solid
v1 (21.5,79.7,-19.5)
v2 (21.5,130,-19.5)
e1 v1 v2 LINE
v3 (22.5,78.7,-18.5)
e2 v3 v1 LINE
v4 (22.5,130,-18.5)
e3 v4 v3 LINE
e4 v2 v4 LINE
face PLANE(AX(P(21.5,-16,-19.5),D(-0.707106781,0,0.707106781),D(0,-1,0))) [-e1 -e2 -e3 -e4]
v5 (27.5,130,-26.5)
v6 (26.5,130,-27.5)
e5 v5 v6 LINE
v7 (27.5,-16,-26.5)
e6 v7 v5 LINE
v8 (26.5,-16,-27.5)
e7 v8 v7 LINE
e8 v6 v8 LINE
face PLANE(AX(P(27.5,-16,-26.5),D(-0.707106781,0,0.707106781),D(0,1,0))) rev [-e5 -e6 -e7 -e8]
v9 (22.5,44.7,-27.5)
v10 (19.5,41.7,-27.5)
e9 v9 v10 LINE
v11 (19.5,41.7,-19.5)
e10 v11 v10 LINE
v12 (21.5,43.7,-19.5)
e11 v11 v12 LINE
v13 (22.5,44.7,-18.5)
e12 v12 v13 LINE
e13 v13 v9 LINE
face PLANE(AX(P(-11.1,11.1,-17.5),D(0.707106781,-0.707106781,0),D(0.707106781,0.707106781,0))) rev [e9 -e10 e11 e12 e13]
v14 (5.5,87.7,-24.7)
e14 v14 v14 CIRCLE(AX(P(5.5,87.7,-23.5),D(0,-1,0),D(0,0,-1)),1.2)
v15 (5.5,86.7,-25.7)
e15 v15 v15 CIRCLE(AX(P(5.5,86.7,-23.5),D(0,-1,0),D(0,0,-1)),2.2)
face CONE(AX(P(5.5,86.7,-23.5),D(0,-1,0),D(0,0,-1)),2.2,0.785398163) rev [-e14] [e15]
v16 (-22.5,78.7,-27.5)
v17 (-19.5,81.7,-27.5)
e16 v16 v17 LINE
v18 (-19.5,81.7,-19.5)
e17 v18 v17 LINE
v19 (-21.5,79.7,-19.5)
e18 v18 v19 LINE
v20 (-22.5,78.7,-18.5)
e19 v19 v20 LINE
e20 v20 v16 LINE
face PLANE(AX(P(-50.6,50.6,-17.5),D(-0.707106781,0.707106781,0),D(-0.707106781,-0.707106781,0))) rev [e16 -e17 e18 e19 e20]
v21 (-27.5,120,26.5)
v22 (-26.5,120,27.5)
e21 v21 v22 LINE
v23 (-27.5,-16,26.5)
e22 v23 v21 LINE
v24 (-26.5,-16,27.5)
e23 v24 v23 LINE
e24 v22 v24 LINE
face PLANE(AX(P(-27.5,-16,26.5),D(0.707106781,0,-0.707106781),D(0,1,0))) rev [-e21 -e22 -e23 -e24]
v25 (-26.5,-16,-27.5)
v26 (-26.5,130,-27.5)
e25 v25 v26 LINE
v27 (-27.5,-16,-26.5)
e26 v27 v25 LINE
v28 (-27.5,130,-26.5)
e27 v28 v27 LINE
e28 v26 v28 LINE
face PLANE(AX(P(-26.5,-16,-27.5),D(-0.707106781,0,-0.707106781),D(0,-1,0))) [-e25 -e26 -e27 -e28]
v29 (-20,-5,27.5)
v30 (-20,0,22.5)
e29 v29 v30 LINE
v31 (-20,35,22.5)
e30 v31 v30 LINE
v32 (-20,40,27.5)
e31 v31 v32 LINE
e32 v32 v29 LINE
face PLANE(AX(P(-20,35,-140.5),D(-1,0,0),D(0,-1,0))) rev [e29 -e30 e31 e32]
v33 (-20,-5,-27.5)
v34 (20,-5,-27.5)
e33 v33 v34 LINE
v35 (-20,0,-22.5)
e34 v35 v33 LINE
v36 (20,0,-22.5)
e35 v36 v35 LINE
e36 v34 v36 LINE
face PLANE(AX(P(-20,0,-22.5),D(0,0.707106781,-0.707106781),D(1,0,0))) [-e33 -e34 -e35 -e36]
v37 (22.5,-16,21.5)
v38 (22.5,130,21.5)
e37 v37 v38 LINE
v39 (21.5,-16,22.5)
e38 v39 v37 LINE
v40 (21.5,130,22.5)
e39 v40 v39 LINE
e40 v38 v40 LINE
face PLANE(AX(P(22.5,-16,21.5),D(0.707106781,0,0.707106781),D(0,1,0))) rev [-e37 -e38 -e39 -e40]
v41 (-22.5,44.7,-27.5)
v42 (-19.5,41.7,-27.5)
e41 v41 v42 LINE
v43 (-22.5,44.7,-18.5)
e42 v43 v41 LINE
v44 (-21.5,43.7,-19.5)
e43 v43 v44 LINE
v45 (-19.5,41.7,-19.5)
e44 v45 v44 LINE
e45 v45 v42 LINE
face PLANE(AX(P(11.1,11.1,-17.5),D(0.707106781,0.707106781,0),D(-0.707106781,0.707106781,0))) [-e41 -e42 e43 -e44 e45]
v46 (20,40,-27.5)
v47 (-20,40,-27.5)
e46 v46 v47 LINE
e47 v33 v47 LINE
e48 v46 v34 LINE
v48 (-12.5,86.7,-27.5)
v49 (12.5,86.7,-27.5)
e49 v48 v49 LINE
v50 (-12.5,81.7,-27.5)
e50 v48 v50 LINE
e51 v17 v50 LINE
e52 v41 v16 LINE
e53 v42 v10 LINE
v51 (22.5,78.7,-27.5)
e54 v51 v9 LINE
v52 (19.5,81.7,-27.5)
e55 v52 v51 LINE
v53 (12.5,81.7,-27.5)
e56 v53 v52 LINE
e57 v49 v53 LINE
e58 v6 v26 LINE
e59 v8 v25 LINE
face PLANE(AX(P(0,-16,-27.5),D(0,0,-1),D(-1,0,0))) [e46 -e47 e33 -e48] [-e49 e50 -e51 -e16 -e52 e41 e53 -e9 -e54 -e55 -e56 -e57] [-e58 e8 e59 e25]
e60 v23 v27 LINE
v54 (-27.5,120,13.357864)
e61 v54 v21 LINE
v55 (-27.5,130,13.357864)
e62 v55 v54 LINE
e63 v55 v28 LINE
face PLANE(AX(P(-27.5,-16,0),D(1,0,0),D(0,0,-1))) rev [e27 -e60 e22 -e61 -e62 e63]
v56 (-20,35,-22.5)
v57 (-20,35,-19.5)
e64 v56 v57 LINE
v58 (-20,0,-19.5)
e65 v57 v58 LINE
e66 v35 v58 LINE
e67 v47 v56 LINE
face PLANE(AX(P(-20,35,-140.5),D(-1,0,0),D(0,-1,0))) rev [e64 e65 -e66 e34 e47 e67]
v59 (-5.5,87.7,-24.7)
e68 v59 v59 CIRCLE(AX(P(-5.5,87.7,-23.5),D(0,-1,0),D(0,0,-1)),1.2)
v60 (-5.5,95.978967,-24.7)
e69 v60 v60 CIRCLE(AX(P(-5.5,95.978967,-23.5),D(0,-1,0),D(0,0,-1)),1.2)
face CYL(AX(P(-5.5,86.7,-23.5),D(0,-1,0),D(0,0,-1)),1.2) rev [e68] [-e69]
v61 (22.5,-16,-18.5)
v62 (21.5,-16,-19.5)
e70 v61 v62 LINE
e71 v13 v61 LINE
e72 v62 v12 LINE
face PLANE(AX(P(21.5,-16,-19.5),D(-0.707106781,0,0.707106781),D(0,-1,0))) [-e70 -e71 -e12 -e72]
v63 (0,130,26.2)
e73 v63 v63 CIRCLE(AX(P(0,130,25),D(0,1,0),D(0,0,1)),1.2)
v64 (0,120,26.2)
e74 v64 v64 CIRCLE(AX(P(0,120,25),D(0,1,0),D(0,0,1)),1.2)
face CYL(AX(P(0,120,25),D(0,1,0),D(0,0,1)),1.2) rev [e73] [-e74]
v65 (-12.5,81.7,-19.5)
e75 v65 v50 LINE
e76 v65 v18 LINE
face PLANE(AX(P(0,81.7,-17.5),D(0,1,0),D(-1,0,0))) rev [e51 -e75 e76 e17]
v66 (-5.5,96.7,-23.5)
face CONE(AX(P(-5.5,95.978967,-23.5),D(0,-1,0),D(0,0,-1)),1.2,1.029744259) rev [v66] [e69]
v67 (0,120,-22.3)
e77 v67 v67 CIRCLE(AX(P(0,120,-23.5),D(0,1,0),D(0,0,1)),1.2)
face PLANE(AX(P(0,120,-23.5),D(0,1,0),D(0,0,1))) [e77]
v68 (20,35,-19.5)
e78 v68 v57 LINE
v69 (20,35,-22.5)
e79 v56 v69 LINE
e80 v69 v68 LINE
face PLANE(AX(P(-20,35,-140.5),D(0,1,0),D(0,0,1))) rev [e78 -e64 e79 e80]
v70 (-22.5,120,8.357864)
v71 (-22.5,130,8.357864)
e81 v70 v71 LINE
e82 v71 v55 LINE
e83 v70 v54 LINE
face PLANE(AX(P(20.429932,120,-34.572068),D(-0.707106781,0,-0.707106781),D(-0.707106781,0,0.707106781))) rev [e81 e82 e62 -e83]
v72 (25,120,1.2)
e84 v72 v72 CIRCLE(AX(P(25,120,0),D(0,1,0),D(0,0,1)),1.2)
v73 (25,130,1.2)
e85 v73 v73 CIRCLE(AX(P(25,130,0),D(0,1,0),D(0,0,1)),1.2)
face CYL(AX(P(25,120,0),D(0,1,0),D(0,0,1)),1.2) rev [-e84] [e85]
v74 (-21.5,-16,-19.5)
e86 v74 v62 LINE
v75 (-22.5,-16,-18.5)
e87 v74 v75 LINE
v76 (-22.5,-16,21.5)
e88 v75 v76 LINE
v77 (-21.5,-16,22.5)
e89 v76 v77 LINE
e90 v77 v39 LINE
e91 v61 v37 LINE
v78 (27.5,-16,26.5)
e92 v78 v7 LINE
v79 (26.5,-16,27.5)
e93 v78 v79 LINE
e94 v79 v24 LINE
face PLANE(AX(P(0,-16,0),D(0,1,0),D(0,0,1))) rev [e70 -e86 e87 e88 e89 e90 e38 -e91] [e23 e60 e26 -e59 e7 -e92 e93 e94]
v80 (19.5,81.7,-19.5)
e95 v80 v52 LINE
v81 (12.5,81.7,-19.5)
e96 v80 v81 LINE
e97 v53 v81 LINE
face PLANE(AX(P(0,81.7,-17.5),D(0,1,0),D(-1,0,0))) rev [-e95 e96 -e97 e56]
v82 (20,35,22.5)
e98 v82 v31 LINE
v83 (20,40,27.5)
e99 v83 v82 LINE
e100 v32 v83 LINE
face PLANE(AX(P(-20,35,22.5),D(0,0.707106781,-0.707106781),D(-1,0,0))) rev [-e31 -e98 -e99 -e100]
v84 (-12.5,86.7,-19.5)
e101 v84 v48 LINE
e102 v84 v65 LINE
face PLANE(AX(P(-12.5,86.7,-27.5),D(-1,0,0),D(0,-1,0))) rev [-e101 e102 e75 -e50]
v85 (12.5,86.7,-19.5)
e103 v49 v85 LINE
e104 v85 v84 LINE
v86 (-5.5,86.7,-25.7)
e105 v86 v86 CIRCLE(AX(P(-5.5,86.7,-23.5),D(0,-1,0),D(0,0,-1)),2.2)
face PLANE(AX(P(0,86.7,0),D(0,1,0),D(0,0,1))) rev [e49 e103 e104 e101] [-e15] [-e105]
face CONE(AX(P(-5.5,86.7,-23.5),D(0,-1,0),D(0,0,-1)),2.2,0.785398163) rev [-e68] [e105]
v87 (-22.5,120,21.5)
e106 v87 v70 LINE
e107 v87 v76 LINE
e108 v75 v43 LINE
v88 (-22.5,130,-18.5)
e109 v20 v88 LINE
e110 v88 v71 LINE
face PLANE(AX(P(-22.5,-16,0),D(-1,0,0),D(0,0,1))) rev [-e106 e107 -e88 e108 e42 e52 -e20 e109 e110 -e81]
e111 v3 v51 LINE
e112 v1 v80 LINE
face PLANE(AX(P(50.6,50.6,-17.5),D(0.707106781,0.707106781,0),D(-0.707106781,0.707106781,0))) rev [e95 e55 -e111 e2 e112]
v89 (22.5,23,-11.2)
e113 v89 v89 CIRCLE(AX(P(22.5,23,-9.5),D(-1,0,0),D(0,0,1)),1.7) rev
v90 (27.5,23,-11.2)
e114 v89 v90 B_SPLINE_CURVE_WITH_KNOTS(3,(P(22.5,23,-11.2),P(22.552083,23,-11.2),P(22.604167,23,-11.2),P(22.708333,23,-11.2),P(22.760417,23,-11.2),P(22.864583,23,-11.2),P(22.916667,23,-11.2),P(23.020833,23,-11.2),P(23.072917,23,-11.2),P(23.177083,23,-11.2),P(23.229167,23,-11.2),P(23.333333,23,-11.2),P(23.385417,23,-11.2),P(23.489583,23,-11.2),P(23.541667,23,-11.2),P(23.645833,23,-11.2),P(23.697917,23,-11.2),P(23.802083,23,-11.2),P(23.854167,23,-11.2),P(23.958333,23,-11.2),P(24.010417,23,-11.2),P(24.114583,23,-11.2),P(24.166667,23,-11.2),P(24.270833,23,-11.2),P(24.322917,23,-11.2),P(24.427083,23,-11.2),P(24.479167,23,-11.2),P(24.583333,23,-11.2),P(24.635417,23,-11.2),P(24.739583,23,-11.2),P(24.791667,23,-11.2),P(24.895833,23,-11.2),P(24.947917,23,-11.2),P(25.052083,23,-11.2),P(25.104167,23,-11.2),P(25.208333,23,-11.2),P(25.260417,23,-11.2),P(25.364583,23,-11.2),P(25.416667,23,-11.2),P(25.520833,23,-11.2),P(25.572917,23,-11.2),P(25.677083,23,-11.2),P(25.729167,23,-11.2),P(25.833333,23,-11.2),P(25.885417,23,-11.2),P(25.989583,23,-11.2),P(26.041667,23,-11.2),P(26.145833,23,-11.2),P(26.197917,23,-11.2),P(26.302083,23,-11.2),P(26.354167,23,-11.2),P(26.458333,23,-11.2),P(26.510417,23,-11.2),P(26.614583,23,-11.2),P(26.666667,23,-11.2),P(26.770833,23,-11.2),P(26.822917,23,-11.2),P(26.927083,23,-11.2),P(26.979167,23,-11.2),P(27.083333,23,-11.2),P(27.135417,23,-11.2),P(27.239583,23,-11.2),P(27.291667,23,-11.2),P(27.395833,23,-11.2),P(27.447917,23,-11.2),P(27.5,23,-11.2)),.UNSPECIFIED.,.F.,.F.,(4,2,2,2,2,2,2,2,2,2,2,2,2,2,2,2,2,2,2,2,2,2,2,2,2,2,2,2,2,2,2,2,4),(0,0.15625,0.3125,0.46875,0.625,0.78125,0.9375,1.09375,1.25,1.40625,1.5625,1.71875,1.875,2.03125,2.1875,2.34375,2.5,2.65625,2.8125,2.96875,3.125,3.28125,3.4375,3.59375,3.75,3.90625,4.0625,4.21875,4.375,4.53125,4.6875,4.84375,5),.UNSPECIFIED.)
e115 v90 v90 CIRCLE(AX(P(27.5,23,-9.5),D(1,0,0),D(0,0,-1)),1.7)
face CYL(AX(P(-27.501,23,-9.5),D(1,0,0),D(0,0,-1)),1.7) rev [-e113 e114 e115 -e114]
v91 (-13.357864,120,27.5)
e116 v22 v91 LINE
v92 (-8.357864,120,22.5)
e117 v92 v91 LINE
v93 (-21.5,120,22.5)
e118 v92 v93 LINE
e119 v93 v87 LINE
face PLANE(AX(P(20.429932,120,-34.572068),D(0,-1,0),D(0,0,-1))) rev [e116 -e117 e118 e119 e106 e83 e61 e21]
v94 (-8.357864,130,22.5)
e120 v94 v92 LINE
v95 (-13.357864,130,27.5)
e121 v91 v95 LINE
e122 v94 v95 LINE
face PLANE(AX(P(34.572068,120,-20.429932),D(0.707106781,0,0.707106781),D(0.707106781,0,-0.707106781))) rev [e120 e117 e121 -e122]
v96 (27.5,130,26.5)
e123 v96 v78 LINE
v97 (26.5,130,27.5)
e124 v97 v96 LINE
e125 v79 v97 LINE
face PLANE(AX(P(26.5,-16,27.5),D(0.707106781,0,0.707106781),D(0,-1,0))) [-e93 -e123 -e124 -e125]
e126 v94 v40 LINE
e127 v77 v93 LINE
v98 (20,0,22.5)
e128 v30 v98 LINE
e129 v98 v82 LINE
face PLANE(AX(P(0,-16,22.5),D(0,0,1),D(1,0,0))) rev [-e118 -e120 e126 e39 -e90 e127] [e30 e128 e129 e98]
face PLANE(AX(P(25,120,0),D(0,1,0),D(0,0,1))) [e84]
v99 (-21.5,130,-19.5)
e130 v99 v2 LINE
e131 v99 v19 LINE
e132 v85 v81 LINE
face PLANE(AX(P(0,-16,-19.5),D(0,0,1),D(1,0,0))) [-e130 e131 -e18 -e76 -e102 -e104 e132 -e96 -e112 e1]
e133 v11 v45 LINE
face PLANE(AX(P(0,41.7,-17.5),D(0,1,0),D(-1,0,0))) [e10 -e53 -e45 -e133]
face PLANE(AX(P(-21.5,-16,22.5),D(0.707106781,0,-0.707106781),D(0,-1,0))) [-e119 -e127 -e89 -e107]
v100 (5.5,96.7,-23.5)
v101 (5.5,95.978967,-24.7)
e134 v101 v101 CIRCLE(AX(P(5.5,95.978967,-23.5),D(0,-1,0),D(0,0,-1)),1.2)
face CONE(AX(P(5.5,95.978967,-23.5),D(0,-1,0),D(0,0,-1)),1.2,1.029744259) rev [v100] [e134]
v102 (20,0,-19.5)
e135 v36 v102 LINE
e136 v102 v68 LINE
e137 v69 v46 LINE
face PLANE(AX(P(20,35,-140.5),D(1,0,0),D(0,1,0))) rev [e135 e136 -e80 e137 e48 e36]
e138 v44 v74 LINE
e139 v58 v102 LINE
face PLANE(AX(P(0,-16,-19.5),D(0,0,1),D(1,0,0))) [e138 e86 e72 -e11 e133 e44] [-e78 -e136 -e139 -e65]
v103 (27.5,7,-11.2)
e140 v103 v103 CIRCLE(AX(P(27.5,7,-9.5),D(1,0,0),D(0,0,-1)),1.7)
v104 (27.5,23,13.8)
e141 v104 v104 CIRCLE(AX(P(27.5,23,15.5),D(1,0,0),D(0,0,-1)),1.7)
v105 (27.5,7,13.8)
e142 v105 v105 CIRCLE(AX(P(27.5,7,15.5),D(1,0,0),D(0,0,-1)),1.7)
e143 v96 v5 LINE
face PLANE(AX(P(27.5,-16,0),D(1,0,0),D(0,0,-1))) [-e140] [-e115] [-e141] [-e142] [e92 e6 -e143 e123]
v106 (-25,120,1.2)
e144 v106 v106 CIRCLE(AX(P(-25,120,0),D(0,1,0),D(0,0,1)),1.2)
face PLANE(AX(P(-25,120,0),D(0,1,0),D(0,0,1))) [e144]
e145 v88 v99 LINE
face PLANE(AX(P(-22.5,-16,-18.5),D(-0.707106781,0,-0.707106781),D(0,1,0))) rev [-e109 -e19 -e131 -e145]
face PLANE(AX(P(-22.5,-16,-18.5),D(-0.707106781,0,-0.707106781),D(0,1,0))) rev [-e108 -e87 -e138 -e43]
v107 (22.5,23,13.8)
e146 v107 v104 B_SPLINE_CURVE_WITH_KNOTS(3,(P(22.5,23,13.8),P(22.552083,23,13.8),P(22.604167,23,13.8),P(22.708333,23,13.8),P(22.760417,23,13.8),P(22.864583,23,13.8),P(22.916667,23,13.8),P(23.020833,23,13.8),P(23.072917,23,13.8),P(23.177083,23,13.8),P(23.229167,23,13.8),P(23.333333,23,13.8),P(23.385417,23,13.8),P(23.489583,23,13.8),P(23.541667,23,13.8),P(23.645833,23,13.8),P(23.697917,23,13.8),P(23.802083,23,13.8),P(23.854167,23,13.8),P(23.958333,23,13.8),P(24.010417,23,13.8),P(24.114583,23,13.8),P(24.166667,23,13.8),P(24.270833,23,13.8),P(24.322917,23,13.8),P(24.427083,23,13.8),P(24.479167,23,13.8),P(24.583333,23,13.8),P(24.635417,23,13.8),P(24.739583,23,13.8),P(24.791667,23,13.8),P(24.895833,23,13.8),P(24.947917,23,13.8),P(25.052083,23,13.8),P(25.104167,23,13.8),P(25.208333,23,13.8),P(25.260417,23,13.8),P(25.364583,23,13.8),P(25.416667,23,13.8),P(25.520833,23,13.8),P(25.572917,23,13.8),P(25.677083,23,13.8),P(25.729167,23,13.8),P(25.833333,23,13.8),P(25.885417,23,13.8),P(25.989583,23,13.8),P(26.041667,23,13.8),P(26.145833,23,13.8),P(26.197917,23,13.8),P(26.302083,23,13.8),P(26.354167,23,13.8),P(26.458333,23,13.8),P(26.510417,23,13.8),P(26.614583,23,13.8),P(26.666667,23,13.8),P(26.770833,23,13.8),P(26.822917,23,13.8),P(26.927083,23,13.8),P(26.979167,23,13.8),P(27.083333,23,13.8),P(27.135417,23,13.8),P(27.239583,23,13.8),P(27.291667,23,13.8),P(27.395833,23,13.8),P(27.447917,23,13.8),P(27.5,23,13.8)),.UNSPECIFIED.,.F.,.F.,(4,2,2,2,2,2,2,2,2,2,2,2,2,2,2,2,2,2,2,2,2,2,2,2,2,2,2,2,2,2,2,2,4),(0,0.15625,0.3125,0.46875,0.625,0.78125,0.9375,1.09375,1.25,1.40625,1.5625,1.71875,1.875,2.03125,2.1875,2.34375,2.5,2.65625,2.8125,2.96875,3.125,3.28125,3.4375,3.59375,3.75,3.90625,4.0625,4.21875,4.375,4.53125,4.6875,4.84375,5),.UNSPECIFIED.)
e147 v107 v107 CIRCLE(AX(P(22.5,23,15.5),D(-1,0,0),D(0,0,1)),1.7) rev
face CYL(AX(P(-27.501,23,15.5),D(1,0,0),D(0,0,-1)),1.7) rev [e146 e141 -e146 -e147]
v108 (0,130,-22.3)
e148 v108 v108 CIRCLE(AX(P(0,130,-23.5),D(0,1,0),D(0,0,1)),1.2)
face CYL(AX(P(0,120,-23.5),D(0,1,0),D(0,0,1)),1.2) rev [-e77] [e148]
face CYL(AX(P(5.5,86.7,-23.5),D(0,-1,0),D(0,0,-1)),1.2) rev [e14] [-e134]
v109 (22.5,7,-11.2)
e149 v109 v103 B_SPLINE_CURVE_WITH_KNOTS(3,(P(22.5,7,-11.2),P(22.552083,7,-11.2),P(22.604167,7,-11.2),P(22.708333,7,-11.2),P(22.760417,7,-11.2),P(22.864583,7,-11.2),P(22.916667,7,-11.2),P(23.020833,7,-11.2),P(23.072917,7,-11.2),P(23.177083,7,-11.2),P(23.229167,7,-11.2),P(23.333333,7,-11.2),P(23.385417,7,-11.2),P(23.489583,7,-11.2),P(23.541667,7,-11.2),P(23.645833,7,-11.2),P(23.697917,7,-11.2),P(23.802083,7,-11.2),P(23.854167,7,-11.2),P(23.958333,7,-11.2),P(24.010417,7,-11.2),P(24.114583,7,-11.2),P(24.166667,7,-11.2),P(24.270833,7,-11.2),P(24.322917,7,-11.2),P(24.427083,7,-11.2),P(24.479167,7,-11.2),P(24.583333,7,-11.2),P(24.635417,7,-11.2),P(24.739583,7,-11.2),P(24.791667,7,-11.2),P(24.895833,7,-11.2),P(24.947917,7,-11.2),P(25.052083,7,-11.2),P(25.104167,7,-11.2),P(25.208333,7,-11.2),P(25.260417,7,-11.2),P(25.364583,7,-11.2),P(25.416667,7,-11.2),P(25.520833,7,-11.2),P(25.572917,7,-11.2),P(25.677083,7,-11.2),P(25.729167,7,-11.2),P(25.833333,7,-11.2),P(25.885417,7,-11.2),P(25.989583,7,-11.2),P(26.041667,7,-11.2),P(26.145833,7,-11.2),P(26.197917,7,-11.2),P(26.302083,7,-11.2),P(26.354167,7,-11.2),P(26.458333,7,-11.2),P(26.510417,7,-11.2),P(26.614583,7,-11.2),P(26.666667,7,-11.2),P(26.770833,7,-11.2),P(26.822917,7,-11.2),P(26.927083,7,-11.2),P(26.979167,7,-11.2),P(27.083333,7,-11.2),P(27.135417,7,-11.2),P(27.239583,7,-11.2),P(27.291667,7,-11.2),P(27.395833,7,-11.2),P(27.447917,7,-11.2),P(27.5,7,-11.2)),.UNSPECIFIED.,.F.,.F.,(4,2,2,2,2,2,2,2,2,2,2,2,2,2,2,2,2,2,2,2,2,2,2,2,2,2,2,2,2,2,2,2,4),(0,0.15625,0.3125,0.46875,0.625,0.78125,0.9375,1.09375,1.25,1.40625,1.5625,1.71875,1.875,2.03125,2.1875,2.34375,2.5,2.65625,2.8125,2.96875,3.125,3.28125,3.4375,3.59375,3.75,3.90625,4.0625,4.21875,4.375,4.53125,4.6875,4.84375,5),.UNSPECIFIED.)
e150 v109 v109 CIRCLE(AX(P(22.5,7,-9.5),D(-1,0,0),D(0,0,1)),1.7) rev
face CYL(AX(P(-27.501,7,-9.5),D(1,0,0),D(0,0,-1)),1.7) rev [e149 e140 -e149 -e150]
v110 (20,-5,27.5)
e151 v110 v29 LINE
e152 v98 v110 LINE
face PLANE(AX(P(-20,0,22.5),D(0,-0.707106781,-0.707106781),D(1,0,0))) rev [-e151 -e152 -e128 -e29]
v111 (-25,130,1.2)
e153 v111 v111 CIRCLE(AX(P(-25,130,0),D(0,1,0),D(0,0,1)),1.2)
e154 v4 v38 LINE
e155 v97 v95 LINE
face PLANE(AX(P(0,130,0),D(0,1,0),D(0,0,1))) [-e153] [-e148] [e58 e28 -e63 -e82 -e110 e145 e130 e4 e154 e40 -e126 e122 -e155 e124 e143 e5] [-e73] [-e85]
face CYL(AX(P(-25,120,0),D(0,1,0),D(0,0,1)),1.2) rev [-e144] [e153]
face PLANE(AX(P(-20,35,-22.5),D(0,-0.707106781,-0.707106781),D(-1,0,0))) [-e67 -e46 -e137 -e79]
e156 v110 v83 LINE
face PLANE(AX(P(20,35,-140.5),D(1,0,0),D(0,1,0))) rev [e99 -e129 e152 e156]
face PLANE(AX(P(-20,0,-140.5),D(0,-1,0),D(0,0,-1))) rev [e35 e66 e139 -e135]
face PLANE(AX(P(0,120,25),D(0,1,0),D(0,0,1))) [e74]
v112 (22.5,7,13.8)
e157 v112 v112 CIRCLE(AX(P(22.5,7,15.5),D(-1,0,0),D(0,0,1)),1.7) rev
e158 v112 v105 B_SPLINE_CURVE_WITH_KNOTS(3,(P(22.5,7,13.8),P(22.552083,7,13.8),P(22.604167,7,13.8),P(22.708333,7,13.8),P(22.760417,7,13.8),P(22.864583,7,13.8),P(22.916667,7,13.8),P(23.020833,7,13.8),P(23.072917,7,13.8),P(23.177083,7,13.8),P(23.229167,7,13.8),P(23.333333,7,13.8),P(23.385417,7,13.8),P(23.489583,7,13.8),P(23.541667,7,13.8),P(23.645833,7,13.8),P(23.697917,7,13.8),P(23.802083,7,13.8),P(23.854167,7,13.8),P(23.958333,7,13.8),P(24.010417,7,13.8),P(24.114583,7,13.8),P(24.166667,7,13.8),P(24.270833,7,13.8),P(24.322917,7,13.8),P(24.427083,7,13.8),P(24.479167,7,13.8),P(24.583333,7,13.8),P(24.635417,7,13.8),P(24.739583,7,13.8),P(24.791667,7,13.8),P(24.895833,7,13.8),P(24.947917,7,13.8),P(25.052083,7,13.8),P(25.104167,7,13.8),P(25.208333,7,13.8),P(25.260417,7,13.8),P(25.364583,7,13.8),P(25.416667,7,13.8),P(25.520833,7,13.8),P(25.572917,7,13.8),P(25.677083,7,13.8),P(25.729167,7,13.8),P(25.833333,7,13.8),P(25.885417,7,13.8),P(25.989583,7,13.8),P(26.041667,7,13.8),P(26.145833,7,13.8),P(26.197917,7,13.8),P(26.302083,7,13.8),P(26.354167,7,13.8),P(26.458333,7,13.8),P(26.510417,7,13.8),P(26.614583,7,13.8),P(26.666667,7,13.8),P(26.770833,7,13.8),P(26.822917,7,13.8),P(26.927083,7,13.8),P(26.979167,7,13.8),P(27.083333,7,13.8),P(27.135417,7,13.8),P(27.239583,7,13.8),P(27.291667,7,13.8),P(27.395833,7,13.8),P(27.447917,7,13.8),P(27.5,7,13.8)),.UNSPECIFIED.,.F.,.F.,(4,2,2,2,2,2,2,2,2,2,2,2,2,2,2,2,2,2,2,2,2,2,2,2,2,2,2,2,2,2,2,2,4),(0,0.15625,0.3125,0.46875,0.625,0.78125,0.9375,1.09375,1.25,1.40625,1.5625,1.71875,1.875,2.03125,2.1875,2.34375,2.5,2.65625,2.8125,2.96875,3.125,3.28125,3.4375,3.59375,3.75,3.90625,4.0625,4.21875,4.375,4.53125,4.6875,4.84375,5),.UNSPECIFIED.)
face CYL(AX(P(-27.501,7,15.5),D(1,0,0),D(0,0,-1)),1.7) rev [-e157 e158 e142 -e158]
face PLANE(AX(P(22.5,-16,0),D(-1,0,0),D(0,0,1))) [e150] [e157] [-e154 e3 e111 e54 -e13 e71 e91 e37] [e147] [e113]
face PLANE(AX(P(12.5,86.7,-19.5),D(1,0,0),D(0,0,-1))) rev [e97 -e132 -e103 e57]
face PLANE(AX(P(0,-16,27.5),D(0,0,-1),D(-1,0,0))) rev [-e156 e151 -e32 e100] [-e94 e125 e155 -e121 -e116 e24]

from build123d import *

# Parameters (mm, degrees)
BOSS_EXTRUDE1_DEPTH                             = 130
BOSS_EXTRUDE1_DEPTH_BACK                        = 16
SKETCH1_W                                       = 55
SKETCH1_H                                       = 55
SKETCH1_W_2                                     = 45
SKETCH1_H_2                                     = 42
SKETCH2_W                                       = 40
SKETCH2_H                                       = 35
CUT_EXTRUDE1_DEPTH                              = 168
CUT_EXTRUDE2_DEPTH                              = 10
SKETCH8_W                                       = 25
SKETCH8_H                                       = 8
CUT_EXTRUDE5_DEPTH                              = 5
CSK_FOR_M2_FLAT_HEAD_MACHINE_SCREW2_D           = 2.4
CSK_FOR_M2_FLAT_HEAD_MACHINE_SCREW2_DEPTH       = 9.278967257
CSK_FOR_M2_FLAT_HEAD_MACHINE_SCREW2_CSINK_D     = 4.4
CSK_FOR_M2_FLAT_HEAD_MACHINE_SCREW2_CSINK_ANGLE = 90
CSK_FOR_M2_FLAT_HEAD_MACHINE_SCREW2_TIP         = 0.721032743
CHAMFER1_SIZE                                   = 1
CHAMFER3_SIZE                                   = 1
CUT_EXTRUDE6_REACH                              = 153.131
SKETCH11_W                                      = 20
SKETCH11_H                                      = 10
CUT_EXTRUDE7_REACH                              = 145.81
SKETCH12_R                                      = 1.7
CHAMFER2_SIZE                                   = 5
SKETCH13_R                                      = 1.2
CUT_EXTRUDE8_DEPTH                              = 10


with BuildPart() as part:
    # Sketch1 → Boss-Extrude1 (new, two sides: drawn at the far end of the back side and taken through both)
    with BuildSketch(Plane(origin=(0, 0, 0), x_dir=(1, 0, 0), z_dir=(0, 1, 0)).offset(-BOSS_EXTRUDE1_DEPTH_BACK)):
        Rectangle(SKETCH1_W, SKETCH1_H)
        with Locations((0, -1.5)):
            Rectangle(SKETCH1_W_2, SKETCH1_H_2, mode=Mode.SUBTRACT)
    extrude(amount=BOSS_EXTRUDE1_DEPTH + BOSS_EXTRUDE1_DEPTH_BACK)

    # Sketch2 → Cut-Extrude1 (cut)
    with BuildSketch(Plane.XY.offset(27.5)):
        with Locations((0, 17.5)):
            Rectangle(SKETCH2_W, SKETCH2_H)
    extrude(amount=-CUT_EXTRUDE1_DEPTH, mode=Mode.SUBTRACT)

    # Sketch7 → Cut-Extrude2 (cut)
    with BuildSketch(Plane(origin=(0, 0, -27.5), x_dir=(-1, 0, 0), z_dir=(0, 0, -1))):
        Polygon((19.5, 41.7), (22.5, 44.7), (22.5, 78.7), (19.5, 81.7), (-19.5, 81.7), (-22.5, 78.7), (-22.5, 44.7), (-19.5, 41.7), align=None)
    extrude(amount=-CUT_EXTRUDE2_DEPTH, mode=Mode.SUBTRACT)

    # Sketch8 → Cut-Extrude5 (cut)
    with BuildSketch(Plane.XZ.offset(-81.7)):
        with Locations((0, -23.5)):
            Rectangle(SKETCH8_W, SKETCH8_H)
    extrude(amount=-CUT_EXTRUDE5_DEPTH, mode=Mode.SUBTRACT)

    # CSK for M2 Flat Head Machine Screw2
    with Locations(Plane(origin=(0, 86.7, 0), x_dir=(-1, 0, 0), z_dir=(0, -1, 0))):
        with Locations((-5.5, 23.5), (5.5, 23.5)):
            CounterSinkHole(CSK_FOR_M2_FLAT_HEAD_MACHINE_SCREW2_D / 2, CSK_FOR_M2_FLAT_HEAD_MACHINE_SCREW2_CSINK_D / 2, depth=CSK_FOR_M2_FLAT_HEAD_MACHINE_SCREW2_DEPTH, counter_sink_angle=CSK_FOR_M2_FLAT_HEAD_MACHINE_SCREW2_CSINK_ANGLE)
            with Locations((0, 0, -(CSK_FOR_M2_FLAT_HEAD_MACHINE_SCREW2_DEPTH + CSK_FOR_M2_FLAT_HEAD_MACHINE_SCREW2_TIP / 2))):  # 118° drill point
                Cone(0, CSK_FOR_M2_FLAT_HEAD_MACHINE_SCREW2_D / 2, CSK_FOR_M2_FLAT_HEAD_MACHINE_SCREW2_TIP, mode=Mode.SUBTRACT)

    # Chamfer1
    chamfer1_edges = [part.edges().sort_by_distance(p)[0] for p in [
        (-22.5, 57, 22.5),
        (22.5, 57, 22.5),
        (22.5, 14.35, -19.5),
        (-22.5, 14.35, -19.5),
        (22.5, 104.35, -19.5),
        (-22.5, 104.35, -19.5),
    ]]
    chamfer(chamfer1_edges, length=CHAMFER1_SIZE)

    # Chamfer3
    chamfer3_edges = [part.edges().sort_by_distance(p)[0] for p in [
        (27.5, 57, 27.5),
        (-27.5, 57, 27.5),
        (-27.5, 57, -27.5),
        (27.5, 57, -27.5),
    ]]
    chamfer(chamfer3_edges, length=CHAMFER3_SIZE)

    # Sketch11 → Cut-Extrude6 (cut, up to next)
    with BuildSketch(Plane(origin=(-27, 0, 27), x_dir=(0.7071067811865475, 0, 0.7071067811865477), z_dir=(-0.7071067811865477, 0, 0.7071067811865475)), mode=Mode.PRIVATE) as cut_extrude6_sk1:
        with Locations((0, 125)):
            Rectangle(SKETCH11_W, SKETCH11_H)
    cut_extrude6_tool1 = extrude(cut_extrude6_sk1.sketch, amount=-CUT_EXTRUDE6_REACH, mode=Mode.PRIVATE) & part.part
    add(cut_extrude6_tool1.solids().sort_by_distance((-27, 125, 27))[0], mode=Mode.SUBTRACT)

    # Sketch12 → Cut-Extrude7 (cut, up to next)
    with BuildSketch(Plane(origin=(27.5, 0, 0), x_dir=(0, 0, -1), z_dir=(1, 0, 0)), mode=Mode.PRIVATE) as cut_extrude7_sk1:
        with Locations((9.5, 7)):
            Circle(SKETCH12_R)
    cut_extrude7_tool1 = extrude(cut_extrude7_sk1.sketch, amount=-CUT_EXTRUDE7_REACH, mode=Mode.PRIVATE) & part.part
    # Sketch12 → Cut-Extrude7 (cut, up to next)
    with BuildSketch(Plane(origin=(27.5, 0, 0), x_dir=(0, 0, -1), z_dir=(1, 0, 0)), mode=Mode.PRIVATE) as cut_extrude7_sk2:
        with Locations((-15.5, 7)):
            Circle(SKETCH12_R)
    cut_extrude7_tool2 = extrude(cut_extrude7_sk2.sketch, amount=-CUT_EXTRUDE7_REACH, mode=Mode.PRIVATE) & part.part
    # Sketch12 → Cut-Extrude7 (cut, up to next)
    with BuildSketch(Plane(origin=(27.5, 0, 0), x_dir=(0, 0, -1), z_dir=(1, 0, 0)), mode=Mode.PRIVATE) as cut_extrude7_sk3:
        with Locations((-15.5, 23)):
            Circle(SKETCH12_R)
    cut_extrude7_tool3 = extrude(cut_extrude7_sk3.sketch, amount=-CUT_EXTRUDE7_REACH, mode=Mode.PRIVATE) & part.part
    # Sketch12 → Cut-Extrude7 (cut, up to next)
    with BuildSketch(Plane(origin=(27.5, 0, 0), x_dir=(0, 0, -1), z_dir=(1, 0, 0)), mode=Mode.PRIVATE) as cut_extrude7_sk4:
        with Locations((9.5, 23)):
            Circle(SKETCH12_R)
    cut_extrude7_tool4 = extrude(cut_extrude7_sk4.sketch, amount=-CUT_EXTRUDE7_REACH, mode=Mode.PRIVATE) & part.part
    add(cut_extrude7_tool1.solids().sort_by_distance((27.5, 7, -9.5))[0], mode=Mode.SUBTRACT)
    add(cut_extrude7_tool2.solids().sort_by_distance((27.5, 7, 15.5))[0], mode=Mode.SUBTRACT)
    add(cut_extrude7_tool3.solids().sort_by_distance((27.5, 23, 15.5))[0], mode=Mode.SUBTRACT)
    add(cut_extrude7_tool4.solids().sort_by_distance((27.5, 23, -9.5))[0], mode=Mode.SUBTRACT)

    # Chamfer2
    chamfer2_edges = [part.edges().sort_by_distance(p)[0] for p in [
        (0, 35, -27.5),
        (0, 0, -27.5),
        (0, 35, 27.5),
        (0, 0, 27.5),
    ]]
    chamfer(chamfer2_edges, length=CHAMFER2_SIZE - 0.0001)  # a hair under: the kernel refuses the full size

    # Sketch13 → Cut-Extrude8 (cut)
    with BuildSketch(Plane(origin=(0, 130, 0), x_dir=(1, 0, 0), z_dir=(0, 1, 0))):
        with Locations(Location((0, 23.5, 0), (0, 0, 270))):
            Circle(SKETCH13_R)
        with Locations(Location((0, -25, 0), (0, 0, 270))):
            Circle(SKETCH13_R)
        with Locations(Location((25, 0, 0), (0, 0, 270))):
            Circle(SKETCH13_R)
        with Locations(Location((-25, 0, 0), (0, 0, 270))):
            Circle(SKETCH13_R)
    extrude(amount=-CUT_EXTRUDE8_DEPTH, mode=Mode.SUBTRACT)


solid = part.part
